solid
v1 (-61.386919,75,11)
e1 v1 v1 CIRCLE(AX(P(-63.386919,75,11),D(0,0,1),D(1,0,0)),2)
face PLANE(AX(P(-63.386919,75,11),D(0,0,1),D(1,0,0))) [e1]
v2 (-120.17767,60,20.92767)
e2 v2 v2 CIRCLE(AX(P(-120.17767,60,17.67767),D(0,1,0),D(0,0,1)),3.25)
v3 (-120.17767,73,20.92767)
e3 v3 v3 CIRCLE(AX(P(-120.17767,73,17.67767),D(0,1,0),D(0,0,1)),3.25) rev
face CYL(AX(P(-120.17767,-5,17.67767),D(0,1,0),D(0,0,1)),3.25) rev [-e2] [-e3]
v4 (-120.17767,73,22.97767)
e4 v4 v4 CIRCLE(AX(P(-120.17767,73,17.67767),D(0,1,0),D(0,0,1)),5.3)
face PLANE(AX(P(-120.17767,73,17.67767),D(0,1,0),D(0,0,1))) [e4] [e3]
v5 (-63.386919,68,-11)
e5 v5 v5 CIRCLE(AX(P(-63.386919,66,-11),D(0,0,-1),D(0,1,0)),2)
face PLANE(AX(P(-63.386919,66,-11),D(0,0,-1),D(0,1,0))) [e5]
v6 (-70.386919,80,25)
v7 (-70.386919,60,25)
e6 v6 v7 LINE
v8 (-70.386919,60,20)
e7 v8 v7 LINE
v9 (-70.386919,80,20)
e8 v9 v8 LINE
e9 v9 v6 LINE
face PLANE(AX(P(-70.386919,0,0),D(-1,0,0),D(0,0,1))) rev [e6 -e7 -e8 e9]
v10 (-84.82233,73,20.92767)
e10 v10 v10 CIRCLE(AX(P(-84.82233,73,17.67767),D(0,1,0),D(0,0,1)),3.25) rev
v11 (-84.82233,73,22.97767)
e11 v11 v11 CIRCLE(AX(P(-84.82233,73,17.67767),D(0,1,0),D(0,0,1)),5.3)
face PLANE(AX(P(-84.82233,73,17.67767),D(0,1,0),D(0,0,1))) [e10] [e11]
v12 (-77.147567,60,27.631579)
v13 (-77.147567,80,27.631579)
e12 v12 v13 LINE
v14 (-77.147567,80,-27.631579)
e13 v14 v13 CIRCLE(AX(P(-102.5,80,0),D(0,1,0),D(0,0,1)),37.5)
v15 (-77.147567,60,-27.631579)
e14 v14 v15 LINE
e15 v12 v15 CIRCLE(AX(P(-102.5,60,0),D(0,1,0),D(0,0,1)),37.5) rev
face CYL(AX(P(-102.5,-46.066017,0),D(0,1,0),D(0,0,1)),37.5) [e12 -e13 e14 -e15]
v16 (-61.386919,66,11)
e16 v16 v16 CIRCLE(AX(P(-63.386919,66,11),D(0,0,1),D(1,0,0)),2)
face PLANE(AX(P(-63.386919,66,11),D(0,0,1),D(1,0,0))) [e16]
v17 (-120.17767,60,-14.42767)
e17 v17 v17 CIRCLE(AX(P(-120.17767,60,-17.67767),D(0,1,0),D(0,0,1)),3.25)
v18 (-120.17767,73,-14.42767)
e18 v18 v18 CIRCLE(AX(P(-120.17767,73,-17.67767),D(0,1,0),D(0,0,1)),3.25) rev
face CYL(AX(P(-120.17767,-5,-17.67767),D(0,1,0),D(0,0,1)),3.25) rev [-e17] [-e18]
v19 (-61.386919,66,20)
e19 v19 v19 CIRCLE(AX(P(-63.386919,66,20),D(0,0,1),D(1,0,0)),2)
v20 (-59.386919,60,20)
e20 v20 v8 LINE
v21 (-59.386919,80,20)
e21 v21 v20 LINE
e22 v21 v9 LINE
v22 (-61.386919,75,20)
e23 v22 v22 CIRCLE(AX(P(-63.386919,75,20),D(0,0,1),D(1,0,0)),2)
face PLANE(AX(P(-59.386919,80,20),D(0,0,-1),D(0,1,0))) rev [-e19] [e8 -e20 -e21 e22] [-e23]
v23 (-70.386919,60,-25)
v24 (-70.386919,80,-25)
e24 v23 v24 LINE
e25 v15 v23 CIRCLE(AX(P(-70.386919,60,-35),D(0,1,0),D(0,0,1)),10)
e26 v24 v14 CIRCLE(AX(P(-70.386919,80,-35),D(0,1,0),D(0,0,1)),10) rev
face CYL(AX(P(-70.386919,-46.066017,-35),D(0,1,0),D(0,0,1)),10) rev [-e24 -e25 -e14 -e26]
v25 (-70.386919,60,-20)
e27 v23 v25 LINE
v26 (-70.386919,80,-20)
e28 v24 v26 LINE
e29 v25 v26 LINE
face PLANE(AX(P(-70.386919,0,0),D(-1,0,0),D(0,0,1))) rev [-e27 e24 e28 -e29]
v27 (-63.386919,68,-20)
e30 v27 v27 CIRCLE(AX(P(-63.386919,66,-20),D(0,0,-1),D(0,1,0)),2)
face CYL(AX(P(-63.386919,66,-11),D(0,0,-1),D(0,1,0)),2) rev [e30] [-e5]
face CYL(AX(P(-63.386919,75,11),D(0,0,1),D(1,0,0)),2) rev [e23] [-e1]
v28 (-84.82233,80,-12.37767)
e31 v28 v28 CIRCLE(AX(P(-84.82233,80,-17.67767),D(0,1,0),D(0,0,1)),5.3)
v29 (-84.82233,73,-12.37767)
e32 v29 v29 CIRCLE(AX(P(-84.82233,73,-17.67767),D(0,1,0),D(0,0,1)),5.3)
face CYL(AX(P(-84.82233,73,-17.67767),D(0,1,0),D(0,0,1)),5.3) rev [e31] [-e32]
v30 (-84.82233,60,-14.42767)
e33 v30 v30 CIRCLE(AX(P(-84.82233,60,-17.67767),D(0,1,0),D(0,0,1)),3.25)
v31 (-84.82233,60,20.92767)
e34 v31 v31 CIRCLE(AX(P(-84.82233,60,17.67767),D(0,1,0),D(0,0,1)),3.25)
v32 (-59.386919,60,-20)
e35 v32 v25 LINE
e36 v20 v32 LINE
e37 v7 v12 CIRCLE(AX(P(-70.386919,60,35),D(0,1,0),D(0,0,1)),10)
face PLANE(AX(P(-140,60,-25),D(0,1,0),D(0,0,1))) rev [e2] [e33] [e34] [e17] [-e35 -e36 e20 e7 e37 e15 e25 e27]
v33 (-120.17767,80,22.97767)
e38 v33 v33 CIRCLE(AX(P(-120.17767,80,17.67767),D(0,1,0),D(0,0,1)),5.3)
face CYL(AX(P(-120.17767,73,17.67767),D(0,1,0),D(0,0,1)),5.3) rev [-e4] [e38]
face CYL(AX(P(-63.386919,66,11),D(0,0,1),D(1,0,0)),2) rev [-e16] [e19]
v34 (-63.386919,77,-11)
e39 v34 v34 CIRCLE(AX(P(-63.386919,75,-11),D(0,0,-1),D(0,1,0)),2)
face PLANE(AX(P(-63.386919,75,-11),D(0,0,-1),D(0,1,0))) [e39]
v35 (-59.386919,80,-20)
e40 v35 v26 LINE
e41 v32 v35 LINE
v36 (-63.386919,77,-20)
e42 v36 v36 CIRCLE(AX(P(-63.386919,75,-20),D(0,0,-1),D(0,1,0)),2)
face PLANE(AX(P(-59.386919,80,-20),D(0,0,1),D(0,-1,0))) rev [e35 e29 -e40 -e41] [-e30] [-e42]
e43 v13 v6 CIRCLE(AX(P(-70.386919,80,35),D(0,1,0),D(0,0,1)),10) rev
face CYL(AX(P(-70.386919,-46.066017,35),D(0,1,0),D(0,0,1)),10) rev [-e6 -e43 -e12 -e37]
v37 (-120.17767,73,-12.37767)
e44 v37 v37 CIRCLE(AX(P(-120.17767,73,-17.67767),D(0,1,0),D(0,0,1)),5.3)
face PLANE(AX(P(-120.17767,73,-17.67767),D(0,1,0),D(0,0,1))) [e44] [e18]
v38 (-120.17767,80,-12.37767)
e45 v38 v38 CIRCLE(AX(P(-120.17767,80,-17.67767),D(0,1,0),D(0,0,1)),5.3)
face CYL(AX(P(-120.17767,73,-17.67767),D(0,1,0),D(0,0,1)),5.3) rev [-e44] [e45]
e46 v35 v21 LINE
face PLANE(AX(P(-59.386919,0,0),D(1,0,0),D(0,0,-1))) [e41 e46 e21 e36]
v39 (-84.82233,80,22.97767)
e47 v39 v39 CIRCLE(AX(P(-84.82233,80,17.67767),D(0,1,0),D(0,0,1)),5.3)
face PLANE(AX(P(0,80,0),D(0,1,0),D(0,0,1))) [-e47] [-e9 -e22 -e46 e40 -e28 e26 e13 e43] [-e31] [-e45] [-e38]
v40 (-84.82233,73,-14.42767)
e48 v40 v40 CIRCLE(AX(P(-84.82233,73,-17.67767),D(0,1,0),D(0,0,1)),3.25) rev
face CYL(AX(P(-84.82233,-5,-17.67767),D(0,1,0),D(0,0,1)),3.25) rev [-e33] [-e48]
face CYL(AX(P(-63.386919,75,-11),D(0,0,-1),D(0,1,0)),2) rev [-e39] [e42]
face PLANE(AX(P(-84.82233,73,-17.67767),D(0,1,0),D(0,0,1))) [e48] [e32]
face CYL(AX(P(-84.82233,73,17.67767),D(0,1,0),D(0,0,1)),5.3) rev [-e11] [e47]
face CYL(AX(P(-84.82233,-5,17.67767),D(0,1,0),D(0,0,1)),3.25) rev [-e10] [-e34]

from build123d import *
from build123d.topology import SkipClean

# Parameters (mm, degrees)
SKETCH1_W                = 50
SKETCH1_H                = 50
SKETCH1_RX               = 19.7
SKETCH1_RY               = 19.1
BOSS_EXTRUDE1_DEPTH      = 35
SKETCH2_W                = 30
SKETCH2_H                = 50
CUT_EXTRUDE1_DEPTH       = 35
SKETCH3_W                = 13
SKETCH3_H                = 50
BOSS_EXTRUDE2_DEPTH      = 20
SKETCH4_R                = 1.5
CUT_EXTRUDE2_DEPTH       = 64.639610377
SKETCH5_W                = 36.974567712
SKETCH5_H                = 20
CUT_EXTRUDE3_DEPTH       = 20
BOSS_EXTRUDE3_DEPTH      = 4
BOSS_EXTRUDE3_DEPTH_BACK = 20
SKETCH6_W                = 14
SKETCH6_H                = 20
SKETCH6_R                = 3.25
SKETCH7_R                = 5.3
SKETCH7_R_2              = 3
CUT_EXTRUDE4_DEPTH       = 6
SKETCH8_W                = 13
SKETCH8_H                = 13.025432288
CUT_EXTRUDE5_DEPTH       = 30
FILLET6_R                = 4
FILLET5_R                = 10
SKETCH9_R                = 5.3
BOSS_EXTRUDE4_DEPTH      = 30
SKETCH10_W               = 20
SKETCH10_H               = 50
BOSS_EXTRUDE5_DEPTH      = 45
FILLET7_R                = 10
SKETCH11_W               = 50
SKETCH11_H               = 20
BOSS_EXTRUDE6_DEPTH      = 85
FILLET8_R                = 9.5
SKETCH13_R               = 37.5
BOSS_EXTRUDE7_DEPTH      = 20
CUT_EXTRUDE6_DEPTH       = 85
FILLET9_R                = 10
FILLET10_R               = 10
SKETCH14_R               = 3.25
CUT_EXTRUDE7_DEPTH       = 85
SKETCH15_R               = 5.3
CUT_EXTRUDE8_DEPTH       = 7
SKETCH16_R               = 3.25
BOSS_EXTRUDE9_DEPTH      = 36
SKETCH16_3_R             = 3.25
CUT_EXTRUDE11_DEPTH      = 10
SKETCH18_W               = 78
SKETCH18_H               = 80
CUT_EXTRUDE13_DEPTH      = 69.386919
SKETCH19_W               = 40
SKETCH19_H               = 20
BOSS_EXTRUDE10_DEPTH     = 11
SKETCH20_R               = 2
CUT_EXTRUDE14_DEPTH      = 9
CUT_EXTRUDE15_START      = -9
SKETCH21_R               = 2
CUT_EXTRUDE15_DEPTH      = 9


# Some blends are built 0.0001 mm under size
with BuildPart() as part:
    # Sketch1 → Boss-Extrude1 (new body)
    with BuildSketch(Plane(origin=(0, 0, 0), x_dir=(1, 0, 0), z_dir=(0, 1, 0))):
        Rectangle(SKETCH1_W, SKETCH1_H)
        with Locations((0, 0)):
            Ellipse(SKETCH1_RX, SKETCH1_RY, mode=Mode.SUBTRACT)
    extrude(amount=BOSS_EXTRUDE1_DEPTH)

    # Sketch2 → Cut-Extrude1 (cut)
    with BuildSketch(Plane(origin=(0, 35, 0), x_dir=(1, 0, 0), z_dir=(0, 1, 0))):
        with Locations((10, 0)):
            Rectangle(SKETCH2_W, SKETCH2_H)
    extrude(amount=-CUT_EXTRUDE1_DEPTH, mode=Mode.SUBTRACT)

    # Sketch3 → Boss-Extrude2 (add)
    with BuildSketch(Plane(origin=(0, 35, 0), x_dir=(1, 0, 0), z_dir=(0, 1, 0))):
        with Locations((-18.5, 0)):
            Rectangle(SKETCH3_W, SKETCH3_H)
    extrude(amount=BOSS_EXTRUDE2_DEPTH)

    # Sketch4 → Cut-Extrude2 (cut, through all)
    with BuildSketch(Plane.ZY.offset(25)):
        with Locations((18.474567712, 50)):
            Circle(SKETCH4_R)
    extrude(amount=-CUT_EXTRUDE2_DEPTH, mode=Mode.SUBTRACT)

    # Sketch5 → Cut-Extrude3 (cut)
    with BuildSketch(Plane(origin=(-12, 55, -25), x_dir=(0, 0, 1), z_dir=(-1, 0, 0))):
        with Locations((18.487283856, -10)):
            Rectangle(SKETCH5_W, SKETCH5_H)
    extrude(amount=CUT_EXTRUDE3_DEPTH, mode=Mode.SUBTRACT)

    # Sketch6 → Boss-Extrude3 (add, two sides: drawn at the far end of the back side and taken through both)
    # profile 1 of 2: a face of its own
    with BuildSketch(Plane(origin=(-5, 0, 0), x_dir=(0, 0, -1), z_dir=(1, 0, 0)).offset(-BOSS_EXTRUDE3_DEPTH_BACK)):
        with Locations((-32, 17.5)):
            Rectangle(SKETCH6_W, SKETCH6_H)
        with Locations((-32, 17.5)):
            Circle(SKETCH6_R, mode=Mode.SUBTRACT)
    # profile 2 of 2: a face of its own
    with BuildSketch(Plane(origin=(-5, 0, 0), x_dir=(0, 0, -1), z_dir=(1, 0, 0)).offset(-BOSS_EXTRUDE3_DEPTH_BACK)):
        with Locations((32, 17.5)):
            Rectangle(SKETCH6_W, SKETCH6_H)
        with Locations((32, 17.5)):
            Circle(SKETCH6_R, mode=Mode.SUBTRACT)
    extrude(amount=BOSS_EXTRUDE3_DEPTH + BOSS_EXTRUDE3_DEPTH_BACK)

    # Sketch7 → Cut-Extrude4 (cut)
    with BuildSketch(Plane.ZY.offset(25)):
        with Locations((-32, 17.5)):
            Circle(SKETCH7_R)
        with Locations((32, 17.5)):
            Circle(SKETCH7_R)
        with Locations((18.474567712, 50)):
            Circle(SKETCH7_R_2)
    extrude(amount=-CUT_EXTRUDE4_DEPTH, mode=Mode.SUBTRACT)

    # Sketch8 → Cut-Extrude5 (cut)
    with BuildSketch(Plane(origin=(0, 35, 0), x_dir=(1, 0, 0), z_dir=(0, 1, 0))):
        with Locations((-18.5, -18.487283856)):
            Rectangle(SKETCH8_W, SKETCH8_H)
    extrude(amount=CUT_EXTRUDE5_DEPTH, mode=Mode.SUBTRACT)

    # Fillet6
    fillet6_edges = [part.edges().sort_by_distance(p)[0] for p in [
        (-5, 17.5, 25),
        (-5, 17.5, -25),
    ]]
    fillet(fillet6_edges, radius=FILLET6_R - 0.0001)  # a hair under: the kernel refuses the full size

    # Fillet5
    # the kernel refuses this fillet: 10 mm, written as the material it adds along each edge
    with BuildSketch(Plane(origin=(-5, 7.5, 25), x_dir=(0, -1, 0), z_dir=(-1, 0, 0))) as fillet5_piece_1:
        with BuildLine():
            CenterArc((10, 9.682458366), FILLET5_R, 180, 75.522487814)
            Line((0, 9.682458366), (0, 0))
            Line((0, 0), (7.5, 0))
        make_face()
    extrude(amount=20)
    with BuildSketch(Plane(origin=(-5, 27.5, 25), x_dir=(0, 0, 1), z_dir=(-1, 0, 0)), Plane(origin=(-5, 7.5, -25), x_dir=(0, 0, -1), z_dir=(-1, 0, 0))) as fillet5_piece_2:
        with BuildLine():
            CenterArc((9.682458366, 10), FILLET5_R, 194.477512186, 75.522487814)
            Line((0, 7.5), (0, 0))
            Line((0, 0), (9.682458366, 0))
        make_face()
    extrude(amount=20)
    with BuildSketch(Plane(origin=(-5, 27.5, -25), x_dir=(0, 0, -1), z_dir=(-1, 0, 0))) as fillet5_piece_3:
        with BuildLine():
            CenterArc((9.682458366, -10), FILLET5_R, 90, 75.522487814)
            Line((0, -7.5), (0, 0))
            Line((0, 0), (9.682458366, 0))
        make_face()
    extrude(amount=20)

    # Sketch9 → Boss-Extrude4 (add)
    with BuildSketch(Plane.ZY.offset(25)):
        with BuildLine():
            Line((39, 27.5), (34.682458366, 27.5))
            ThreePointArc((34.682458366, 27.5), (28.558734009, 29.59430585), (25, 35))
            Line((25, 35), (-25, 35))
            ThreePointArc((-25, 35), (-28.558734009, 29.59430585), (-34.682458366, 27.5))
            Line((-34.682458366, 27.5), (-39, 27.5))
            Line((-39, 27.5), (-39, 7.5))
            Line((-39, 7.5), (-34.682458366, 7.5))
            ThreePointArc((-34.682458366, 7.5), (-28.558734009, 5.40569415), (-25, 0))
            Line((-25, 0), (25, 0))
            ThreePointArc((25, 0), (28.558734009, 5.40569415), (34.682458366, 7.5))
            Line((34.682458366, 7.5), (39, 7.5))
            Line((39, 7.5), (39, 27.5))
        make_face()
        with Locations((32, 17.5)):
            Circle(SKETCH9_R, mode=Mode.SUBTRACT)
        with Locations((-32, 17.5)):
            Circle(SKETCH9_R, mode=Mode.SUBTRACT)
    extrude(amount=BOSS_EXTRUDE4_DEPTH)

    # Sketch10 → Boss-Extrude5 (add)
    with SkipClean():  # the faces are left unmerged after this step: merging them gives an invalid solid
        with BuildSketch(Plane(origin=(0, 35, 0), x_dir=(1, 0, 0), z_dir=(0, 1, 0))):
            with Locations((-45, 0)):
                Rectangle(SKETCH10_W, SKETCH10_H)
        extrude(amount=BOSS_EXTRUDE5_DEPTH)

    # Fillet7
    fillet7_edges = [part.edges().sort_by_distance(p)[0] for p in [
        (-35, 35, 0),
    ]]
    fillet(fillet7_edges, radius=FILLET7_R - 0.0001)  # a hair under: the kernel refuses the full size

    # Sketch11 → Boss-Extrude6 (add)
    with BuildSketch(Plane.ZY.offset(55)):
        with Locations((0, 70)):
            Rectangle(SKETCH11_W, SKETCH11_H)
    extrude(amount=BOSS_EXTRUDE6_DEPTH)

    # Fillet8
    fillet8_edges = [part.edges().sort_by_distance(p)[0] for p in [
        (-55, 60, 0),
    ]]
    fillet(fillet8_edges, radius=FILLET8_R)

    # Sketch13 → Boss-Extrude7 (add)
    with BuildSketch(Plane(origin=(0, 80, 0), x_dir=(1, 0, 0), z_dir=(0, 1, 0))):
        with Locations((-102.5, 0)):
            Circle(SKETCH13_R)
    extrude(amount=-BOSS_EXTRUDE7_DEPTH)

    # Sketch13<3> → Cut-Extrude6 (cut)
    with BuildSketch(Plane(origin=(0, 80, 0), x_dir=(1, 0, 0), z_dir=(0, 1, 0))):
        with BuildLine():
            Line((-124.371968295, 30.460909424), (-140, 25))
            Line((-140, 25), (-140, 0))
            ThreePointArc((-140, 0), (-135.865017691, 17.117990375), (-124.371968295, 30.460909424))
        make_face()
        with BuildLine():
            ThreePointArc((-130.450849719, -25), (-137.531463461, -13.380828366), (-140, 0))
            Line((-140, 0), (-140, -25))
            Line((-140, -25), (-130.450849719, -25))
        make_face()
    extrude(amount=-CUT_EXTRUDE6_DEPTH, mode=Mode.SUBTRACT)

    # Fillet9
    fillet9_edges = [part.edges().sort_by_distance(p)[0] for p in [
        (-74.549150281, 70, 25),
        (-74.549150281, 70, -25),
    ]]
    fillet(fillet9_edges, radius=FILLET9_R)

    # Fillet10
    fillet10_edges = [part.edges().sort_by_distance(p)[0] for p in [
        (-35, 80, 0),
    ]]
    fillet(fillet10_edges, radius=FILLET10_R)

    # Sketch14 → Cut-Extrude7 (cut)
    with BuildSketch(Plane(origin=(0, 80, 0), x_dir=(1, 0, 0), z_dir=(0, 1, 0))):
        with Locations(Location((-120.17766953, 17.67766953, 0), (0, 0, 270))):
            Circle(SKETCH14_R)
        with Locations(Location((-120.17766953, -17.67766953, 0), (0, 0, 270))):
            Circle(SKETCH14_R)
        with Locations(Location((-84.82233047, -17.67766953, 0), (0, 0, 270))):
            Circle(SKETCH14_R)
        with Locations(Location((-84.82233047, 17.67766953, 0), (0, 0, 270))):
            Circle(SKETCH14_R)
    extrude(amount=-CUT_EXTRUDE7_DEPTH, mode=Mode.SUBTRACT)

    # Sketch15 → Cut-Extrude8 (cut)
    with BuildSketch(Plane(origin=(0, 80, 0), x_dir=(1, 0, 0), z_dir=(0, 1, 0))):
        with Locations(Location((-120.17766953, 17.67766953, 0), (0, 0, 270))):
            Circle(SKETCH15_R)
        with Locations(Location((-120.17766953, -17.67766953, 0), (0, 0, 270))):
            Circle(SKETCH15_R)
        with Locations(Location((-84.82233047, -17.67766953, 0), (0, 0, 270))):
            Circle(SKETCH15_R)
        with Locations(Location((-84.82233047, 17.67766953, 0), (0, 0, 270))):
            Circle(SKETCH15_R)
    extrude(amount=-CUT_EXTRUDE8_DEPTH, mode=Mode.SUBTRACT)

    # Sketch16 → Boss-Extrude9 (add)
    # profile 1 of 2: a face of its own
    with BuildSketch(Plane.ZY.offset(55)):
        Polygon((-25.937822174, 17.5), (-28.968911087, 22.75), (-35.031088913, 22.75), (-38.062177826, 17.5), (-35.031088913, 12.25), (-28.968911087, 12.25), align=None)
        with Locations(Location((-32, 17.5, 0), (0, 0, 180))):
            Circle(SKETCH16_R, mode=Mode.SUBTRACT)
    # profile 2 of 2: a face of its own
    with BuildSketch(Plane.ZY.offset(55)):
        Polygon((25.937822174, 17.5), (28.968911087, 12.25), (35.031088913, 12.25), (38.062177826, 17.5), (35.031088913, 22.75), (28.968911087, 22.75), align=None)
        with Locations(Location((32, 17.5, 0), (0, 0, 180))):
            Circle(SKETCH16_R, mode=Mode.SUBTRACT)
    extrude(amount=-BOSS_EXTRUDE9_DEPTH)

    # Sketch16<3> → Cut-Extrude11 (cut)
    # profile 1 of 2: a face of its own
    with BuildSketch(Plane.ZY.offset(55)):
        Polygon((-25.937822174, 17.5), (-28.968911087, 22.75), (-35.031088913, 22.75), (-38.062177826, 17.5), (-35.031088913, 12.25), (-28.968911087, 12.25), align=None)
        with Locations(Location((-32, 17.5, 0), (0, 0, 180))):
            Circle(SKETCH16_3_R, mode=Mode.SUBTRACT)
    # profile 2 of 2: a face of its own
    with BuildSketch(Plane.ZY.offset(55)):
        Polygon((25.937822174, 17.5), (28.968911087, 12.25), (35.031088913, 12.25), (38.062177826, 17.5), (35.031088913, 22.75), (28.968911087, 22.75), align=None)
        with Locations(Location((32, 17.5, 0), (0, 0, 180))):
            Circle(SKETCH16_3_R, mode=Mode.SUBTRACT)
    extrude(amount=-CUT_EXTRUDE11_DEPTH, mode=Mode.SUBTRACT)

    # Sketch18 → Cut-Extrude13 (cut)
    with BuildSketch(Plane(origin=(-1, 0, 0), x_dir=(0, 0, -1), z_dir=(1, 0, 0))):
        with Locations((0, 40)):
            Rectangle(SKETCH18_W, SKETCH18_H)
    extrude(amount=-CUT_EXTRUDE13_DEPTH, mode=Mode.SUBTRACT)


with BuildPart() as boss_extrude10_tool:
    # Sketch19 → Boss-Extrude10 (new body)
    with BuildSketch(Plane(origin=(-70.386918553, 0, 0), x_dir=(0, 0, -1), z_dir=(1, 0, 0))):
        with Locations((0, 70)):
            Rectangle(SKETCH19_W, SKETCH19_H)
    extrude(amount=BOSS_EXTRUDE10_DEPTH)


with BuildPart() as part_1:
    add(part.part)


with BuildPart() as part_2:
    # Boss-Extrude10: joined with boss_extrude10_tool
    add(part_1.part.fuse(boss_extrude10_tool.part, tol=0.00001))

    # Sketch20 → Cut-Extrude14 (cut)
    with BuildSketch(Plane.XY.offset(20)):
        with Locations((-63.386918553, 75)):
            Circle(SKETCH20_R)
        with Locations((-63.386918553, 66)):
            Circle(SKETCH20_R)
    extrude(amount=-CUT_EXTRUDE14_DEPTH, mode=Mode.SUBTRACT)

    # Sketch21 → Cut-Extrude15 (cut)
    with BuildSketch(Plane(origin=(0, 0, -20), x_dir=(-1, 0, 0), z_dir=(0, 0, -1)).offset(CUT_EXTRUDE15_START)):
        with Locations(Location((63.386918553, 75, 0), (0, 0, 180))):
            Circle(SKETCH21_R)
        with Locations(Location((63.386918553, 66, 0), (0, 0, 180))):
            Circle(SKETCH21_R)
    extrude(amount=CUT_EXTRUDE15_DEPTH, mode=Mode.SUBTRACT)


solid = part_2.part
